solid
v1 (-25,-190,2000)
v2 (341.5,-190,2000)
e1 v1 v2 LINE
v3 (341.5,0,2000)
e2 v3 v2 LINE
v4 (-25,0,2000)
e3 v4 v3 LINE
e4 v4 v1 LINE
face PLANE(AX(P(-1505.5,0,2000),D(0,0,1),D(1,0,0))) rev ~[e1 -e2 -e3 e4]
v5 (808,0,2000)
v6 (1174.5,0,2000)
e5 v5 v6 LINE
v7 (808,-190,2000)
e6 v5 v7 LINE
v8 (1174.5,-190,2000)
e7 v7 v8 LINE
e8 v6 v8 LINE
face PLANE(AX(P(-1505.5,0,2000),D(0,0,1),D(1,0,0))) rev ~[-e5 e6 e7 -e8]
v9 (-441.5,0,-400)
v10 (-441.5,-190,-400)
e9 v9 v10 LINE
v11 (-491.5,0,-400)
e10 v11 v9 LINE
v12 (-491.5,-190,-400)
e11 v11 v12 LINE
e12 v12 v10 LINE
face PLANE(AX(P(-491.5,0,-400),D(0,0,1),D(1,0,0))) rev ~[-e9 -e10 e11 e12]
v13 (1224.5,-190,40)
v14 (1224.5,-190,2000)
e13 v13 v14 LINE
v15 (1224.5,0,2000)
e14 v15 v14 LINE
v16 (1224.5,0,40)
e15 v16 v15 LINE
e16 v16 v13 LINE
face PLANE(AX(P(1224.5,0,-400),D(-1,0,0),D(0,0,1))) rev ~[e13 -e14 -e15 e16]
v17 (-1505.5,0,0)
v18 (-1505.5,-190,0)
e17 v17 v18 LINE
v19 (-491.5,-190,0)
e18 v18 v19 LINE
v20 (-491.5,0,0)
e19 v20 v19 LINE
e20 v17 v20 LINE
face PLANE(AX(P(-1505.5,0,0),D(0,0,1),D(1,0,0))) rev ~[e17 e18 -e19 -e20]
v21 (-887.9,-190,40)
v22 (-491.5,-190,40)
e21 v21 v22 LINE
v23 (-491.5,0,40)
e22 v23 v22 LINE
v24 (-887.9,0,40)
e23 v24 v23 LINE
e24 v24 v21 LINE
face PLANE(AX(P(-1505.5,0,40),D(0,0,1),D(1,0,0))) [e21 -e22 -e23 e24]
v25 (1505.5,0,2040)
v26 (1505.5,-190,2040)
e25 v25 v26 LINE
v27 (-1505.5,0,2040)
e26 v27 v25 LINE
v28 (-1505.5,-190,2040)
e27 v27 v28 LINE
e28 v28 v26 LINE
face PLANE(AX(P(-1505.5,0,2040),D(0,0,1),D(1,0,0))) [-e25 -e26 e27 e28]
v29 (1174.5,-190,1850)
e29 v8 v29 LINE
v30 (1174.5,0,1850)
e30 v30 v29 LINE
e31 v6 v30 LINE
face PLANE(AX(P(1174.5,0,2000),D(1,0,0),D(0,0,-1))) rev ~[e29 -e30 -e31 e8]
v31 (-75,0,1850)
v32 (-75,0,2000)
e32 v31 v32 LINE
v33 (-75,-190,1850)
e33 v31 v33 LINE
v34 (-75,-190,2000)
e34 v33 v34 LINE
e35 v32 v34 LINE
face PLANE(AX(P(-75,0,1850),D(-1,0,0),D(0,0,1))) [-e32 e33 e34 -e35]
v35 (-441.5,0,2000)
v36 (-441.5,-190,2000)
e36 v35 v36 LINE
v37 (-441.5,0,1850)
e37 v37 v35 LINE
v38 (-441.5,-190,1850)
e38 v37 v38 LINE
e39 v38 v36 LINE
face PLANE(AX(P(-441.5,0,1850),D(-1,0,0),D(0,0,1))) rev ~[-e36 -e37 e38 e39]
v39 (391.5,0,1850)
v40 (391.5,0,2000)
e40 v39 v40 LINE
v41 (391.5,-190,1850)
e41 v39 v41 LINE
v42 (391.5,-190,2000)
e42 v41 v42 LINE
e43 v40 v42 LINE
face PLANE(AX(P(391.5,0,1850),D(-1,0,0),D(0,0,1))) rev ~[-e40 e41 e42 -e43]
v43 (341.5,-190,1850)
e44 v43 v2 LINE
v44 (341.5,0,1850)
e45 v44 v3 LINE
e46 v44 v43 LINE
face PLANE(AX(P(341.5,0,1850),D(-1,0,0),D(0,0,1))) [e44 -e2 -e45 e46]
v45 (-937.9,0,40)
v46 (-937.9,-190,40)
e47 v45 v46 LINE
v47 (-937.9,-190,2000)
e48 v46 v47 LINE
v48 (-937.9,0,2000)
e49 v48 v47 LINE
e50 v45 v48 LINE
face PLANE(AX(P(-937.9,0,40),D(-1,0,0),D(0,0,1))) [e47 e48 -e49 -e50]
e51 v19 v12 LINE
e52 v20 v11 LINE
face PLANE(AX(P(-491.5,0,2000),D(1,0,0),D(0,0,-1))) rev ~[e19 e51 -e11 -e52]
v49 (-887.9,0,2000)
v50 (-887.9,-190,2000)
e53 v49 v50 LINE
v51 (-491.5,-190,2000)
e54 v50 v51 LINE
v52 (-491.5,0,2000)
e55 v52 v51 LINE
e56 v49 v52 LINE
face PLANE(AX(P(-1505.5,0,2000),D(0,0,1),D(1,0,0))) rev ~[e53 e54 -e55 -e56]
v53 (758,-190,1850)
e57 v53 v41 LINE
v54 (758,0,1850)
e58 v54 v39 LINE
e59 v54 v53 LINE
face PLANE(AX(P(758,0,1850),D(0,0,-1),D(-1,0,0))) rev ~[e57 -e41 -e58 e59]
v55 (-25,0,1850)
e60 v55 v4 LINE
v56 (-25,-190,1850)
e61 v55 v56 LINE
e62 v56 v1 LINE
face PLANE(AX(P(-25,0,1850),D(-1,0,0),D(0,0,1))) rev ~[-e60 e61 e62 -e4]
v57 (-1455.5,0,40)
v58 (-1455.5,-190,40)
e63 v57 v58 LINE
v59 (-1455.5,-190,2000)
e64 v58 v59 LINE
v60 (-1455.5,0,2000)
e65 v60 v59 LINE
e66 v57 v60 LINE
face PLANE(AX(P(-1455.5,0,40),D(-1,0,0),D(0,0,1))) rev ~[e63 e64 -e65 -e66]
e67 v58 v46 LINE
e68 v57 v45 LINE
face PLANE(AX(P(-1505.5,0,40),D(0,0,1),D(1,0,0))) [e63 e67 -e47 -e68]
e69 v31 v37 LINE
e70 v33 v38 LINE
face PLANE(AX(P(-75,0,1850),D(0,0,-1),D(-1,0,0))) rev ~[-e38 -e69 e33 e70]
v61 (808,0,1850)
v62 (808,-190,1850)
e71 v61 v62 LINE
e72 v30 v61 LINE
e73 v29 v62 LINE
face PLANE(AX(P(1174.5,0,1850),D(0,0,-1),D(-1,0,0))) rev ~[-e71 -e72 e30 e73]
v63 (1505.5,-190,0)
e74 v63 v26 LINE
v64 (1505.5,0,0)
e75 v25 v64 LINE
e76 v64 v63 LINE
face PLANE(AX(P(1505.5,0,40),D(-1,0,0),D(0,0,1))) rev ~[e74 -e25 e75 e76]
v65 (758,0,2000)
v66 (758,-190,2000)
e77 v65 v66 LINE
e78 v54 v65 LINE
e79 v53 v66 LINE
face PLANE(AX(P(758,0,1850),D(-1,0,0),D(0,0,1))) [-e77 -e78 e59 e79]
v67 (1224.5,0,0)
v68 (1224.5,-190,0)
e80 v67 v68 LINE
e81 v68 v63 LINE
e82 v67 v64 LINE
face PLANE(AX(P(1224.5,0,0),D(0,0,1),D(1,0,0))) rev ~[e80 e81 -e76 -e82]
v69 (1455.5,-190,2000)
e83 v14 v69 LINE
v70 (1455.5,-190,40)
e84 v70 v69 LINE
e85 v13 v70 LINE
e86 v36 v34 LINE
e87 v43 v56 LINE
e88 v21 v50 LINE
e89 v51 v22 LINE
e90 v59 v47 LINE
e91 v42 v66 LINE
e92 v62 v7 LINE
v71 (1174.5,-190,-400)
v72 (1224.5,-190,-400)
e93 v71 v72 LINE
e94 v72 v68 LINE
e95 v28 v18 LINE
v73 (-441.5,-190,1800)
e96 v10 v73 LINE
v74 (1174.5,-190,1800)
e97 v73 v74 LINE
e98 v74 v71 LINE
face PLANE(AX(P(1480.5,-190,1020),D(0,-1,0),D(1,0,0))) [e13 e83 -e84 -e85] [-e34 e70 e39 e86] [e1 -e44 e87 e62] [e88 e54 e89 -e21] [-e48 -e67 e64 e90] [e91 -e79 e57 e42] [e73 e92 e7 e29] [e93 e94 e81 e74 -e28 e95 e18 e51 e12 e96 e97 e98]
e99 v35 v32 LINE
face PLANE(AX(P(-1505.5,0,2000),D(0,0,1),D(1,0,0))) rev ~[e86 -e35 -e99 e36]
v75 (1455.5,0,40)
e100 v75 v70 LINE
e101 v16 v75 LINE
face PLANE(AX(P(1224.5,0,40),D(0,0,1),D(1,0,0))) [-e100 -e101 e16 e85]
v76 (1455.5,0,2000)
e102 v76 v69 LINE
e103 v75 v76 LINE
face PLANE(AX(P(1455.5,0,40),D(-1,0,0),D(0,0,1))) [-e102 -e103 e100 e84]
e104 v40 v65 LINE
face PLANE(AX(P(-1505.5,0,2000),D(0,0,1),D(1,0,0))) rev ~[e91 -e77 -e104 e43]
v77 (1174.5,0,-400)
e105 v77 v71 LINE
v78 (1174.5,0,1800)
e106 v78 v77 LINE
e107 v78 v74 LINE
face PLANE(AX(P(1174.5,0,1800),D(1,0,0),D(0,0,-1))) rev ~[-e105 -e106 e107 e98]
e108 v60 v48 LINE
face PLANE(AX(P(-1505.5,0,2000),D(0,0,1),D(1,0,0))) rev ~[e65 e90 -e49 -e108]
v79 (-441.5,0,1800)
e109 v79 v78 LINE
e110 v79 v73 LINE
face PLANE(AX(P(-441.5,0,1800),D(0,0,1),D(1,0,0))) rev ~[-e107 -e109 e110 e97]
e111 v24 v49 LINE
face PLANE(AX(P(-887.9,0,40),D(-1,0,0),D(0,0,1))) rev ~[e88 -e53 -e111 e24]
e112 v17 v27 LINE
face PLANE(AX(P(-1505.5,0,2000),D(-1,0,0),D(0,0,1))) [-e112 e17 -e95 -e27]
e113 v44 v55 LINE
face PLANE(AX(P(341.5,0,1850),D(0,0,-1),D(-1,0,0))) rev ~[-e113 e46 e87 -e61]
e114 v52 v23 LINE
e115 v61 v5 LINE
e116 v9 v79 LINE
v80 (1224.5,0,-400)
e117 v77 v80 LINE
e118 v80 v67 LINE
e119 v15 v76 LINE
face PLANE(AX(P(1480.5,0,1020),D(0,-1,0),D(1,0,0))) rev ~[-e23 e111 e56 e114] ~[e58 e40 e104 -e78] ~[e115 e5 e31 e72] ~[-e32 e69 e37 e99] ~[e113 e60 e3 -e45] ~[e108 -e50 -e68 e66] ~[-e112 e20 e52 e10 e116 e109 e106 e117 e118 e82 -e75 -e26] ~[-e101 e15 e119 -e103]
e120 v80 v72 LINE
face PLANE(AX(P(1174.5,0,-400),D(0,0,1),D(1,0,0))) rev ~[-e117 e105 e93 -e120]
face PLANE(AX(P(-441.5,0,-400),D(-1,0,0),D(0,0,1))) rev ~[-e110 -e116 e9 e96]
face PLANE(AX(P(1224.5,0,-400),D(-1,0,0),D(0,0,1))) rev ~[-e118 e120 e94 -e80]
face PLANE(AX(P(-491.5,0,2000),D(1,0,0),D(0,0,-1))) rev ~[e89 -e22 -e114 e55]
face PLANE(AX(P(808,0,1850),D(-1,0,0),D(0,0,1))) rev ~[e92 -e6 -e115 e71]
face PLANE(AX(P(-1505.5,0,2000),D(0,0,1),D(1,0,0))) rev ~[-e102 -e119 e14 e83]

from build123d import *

# Parameters (mm, degrees)
F0_W     = 1014
F0_H     = 40
F1_DEPTH = 190
F0_W_2   = 3011
F2_DEPTH = 190
F3_W     = 50
F3_H     = 1960
F3_H_2   = 150
F0_W_3   = 281
F4_DEPTH = 190


# Not quite as in the source:
# - a feature names something its author has since deleted; it is built from what else it names


with BuildPart() as f1:
    # F0 (on Front) → F1 (new body)
    with BuildSketch(Plane.XZ):
        with Locations((-998.5, 20)):
            Rectangle(F0_W, F0_H)
    extrude(amount=F1_DEPTH)



with BuildPart() as f2:
    # F0 (on Front) → F2 (new body)
    with BuildSketch(Plane.XZ):
        with Locations((0, 2020)):
            Rectangle(F0_W_2, F0_H)
    extrude(amount=F2_DEPTH)


with BuildPart() as f1_1:
    add(f1.part)

    add(f2.part)  # F4 merges F2
    # F3 (on Front) + F0 (on Front) → F4 (join)
    with BuildSketch(Plane.XZ):
        with Locations((1480.5, 1020)):
            Rectangle(F3_W, F3_H)
        Polygon((1224.5, 2000), (1174.5, 2000), (1174.5, 1850), (1174.5, 1800), (1174.5, -400), (1224.5, -400), align=None)
        with Locations((783, 1925)):
            Rectangle(F3_W, F3_H_2)
        with Locations((366.5, 1925)):
            Rectangle(F3_W, F3_H_2)
        with Locations((-50, 1925)):
            Rectangle(F3_W, F3_H_2)
        Polygon((-441.5, -400), (-441.5, 1800), (-441.5, 1850), (-441.5, 2000), (-491.5, 2000), (-491.5, -400), align=None)
        with Locations((-912.9, 1020)):
            Rectangle(F3_W, F3_H)
        with Locations((-1480.5, 1020)):
            Rectangle(F3_W, F3_H)
        Polygon((1174.5, 1800), (1174.5, 1850), (808, 1850), (758, 1850), (391.5, 1850), (341.5, 1850), (-25, 1850), (-75, 1850), (-441.5, 1850), (-441.5, 1800), align=None)
    with BuildSketch(Plane.XZ):
        with Locations((1365, 20)):
            Rectangle(F0_W_3, F0_H)
    extrude(amount=F4_DEPTH)


solid = f1_1.part
